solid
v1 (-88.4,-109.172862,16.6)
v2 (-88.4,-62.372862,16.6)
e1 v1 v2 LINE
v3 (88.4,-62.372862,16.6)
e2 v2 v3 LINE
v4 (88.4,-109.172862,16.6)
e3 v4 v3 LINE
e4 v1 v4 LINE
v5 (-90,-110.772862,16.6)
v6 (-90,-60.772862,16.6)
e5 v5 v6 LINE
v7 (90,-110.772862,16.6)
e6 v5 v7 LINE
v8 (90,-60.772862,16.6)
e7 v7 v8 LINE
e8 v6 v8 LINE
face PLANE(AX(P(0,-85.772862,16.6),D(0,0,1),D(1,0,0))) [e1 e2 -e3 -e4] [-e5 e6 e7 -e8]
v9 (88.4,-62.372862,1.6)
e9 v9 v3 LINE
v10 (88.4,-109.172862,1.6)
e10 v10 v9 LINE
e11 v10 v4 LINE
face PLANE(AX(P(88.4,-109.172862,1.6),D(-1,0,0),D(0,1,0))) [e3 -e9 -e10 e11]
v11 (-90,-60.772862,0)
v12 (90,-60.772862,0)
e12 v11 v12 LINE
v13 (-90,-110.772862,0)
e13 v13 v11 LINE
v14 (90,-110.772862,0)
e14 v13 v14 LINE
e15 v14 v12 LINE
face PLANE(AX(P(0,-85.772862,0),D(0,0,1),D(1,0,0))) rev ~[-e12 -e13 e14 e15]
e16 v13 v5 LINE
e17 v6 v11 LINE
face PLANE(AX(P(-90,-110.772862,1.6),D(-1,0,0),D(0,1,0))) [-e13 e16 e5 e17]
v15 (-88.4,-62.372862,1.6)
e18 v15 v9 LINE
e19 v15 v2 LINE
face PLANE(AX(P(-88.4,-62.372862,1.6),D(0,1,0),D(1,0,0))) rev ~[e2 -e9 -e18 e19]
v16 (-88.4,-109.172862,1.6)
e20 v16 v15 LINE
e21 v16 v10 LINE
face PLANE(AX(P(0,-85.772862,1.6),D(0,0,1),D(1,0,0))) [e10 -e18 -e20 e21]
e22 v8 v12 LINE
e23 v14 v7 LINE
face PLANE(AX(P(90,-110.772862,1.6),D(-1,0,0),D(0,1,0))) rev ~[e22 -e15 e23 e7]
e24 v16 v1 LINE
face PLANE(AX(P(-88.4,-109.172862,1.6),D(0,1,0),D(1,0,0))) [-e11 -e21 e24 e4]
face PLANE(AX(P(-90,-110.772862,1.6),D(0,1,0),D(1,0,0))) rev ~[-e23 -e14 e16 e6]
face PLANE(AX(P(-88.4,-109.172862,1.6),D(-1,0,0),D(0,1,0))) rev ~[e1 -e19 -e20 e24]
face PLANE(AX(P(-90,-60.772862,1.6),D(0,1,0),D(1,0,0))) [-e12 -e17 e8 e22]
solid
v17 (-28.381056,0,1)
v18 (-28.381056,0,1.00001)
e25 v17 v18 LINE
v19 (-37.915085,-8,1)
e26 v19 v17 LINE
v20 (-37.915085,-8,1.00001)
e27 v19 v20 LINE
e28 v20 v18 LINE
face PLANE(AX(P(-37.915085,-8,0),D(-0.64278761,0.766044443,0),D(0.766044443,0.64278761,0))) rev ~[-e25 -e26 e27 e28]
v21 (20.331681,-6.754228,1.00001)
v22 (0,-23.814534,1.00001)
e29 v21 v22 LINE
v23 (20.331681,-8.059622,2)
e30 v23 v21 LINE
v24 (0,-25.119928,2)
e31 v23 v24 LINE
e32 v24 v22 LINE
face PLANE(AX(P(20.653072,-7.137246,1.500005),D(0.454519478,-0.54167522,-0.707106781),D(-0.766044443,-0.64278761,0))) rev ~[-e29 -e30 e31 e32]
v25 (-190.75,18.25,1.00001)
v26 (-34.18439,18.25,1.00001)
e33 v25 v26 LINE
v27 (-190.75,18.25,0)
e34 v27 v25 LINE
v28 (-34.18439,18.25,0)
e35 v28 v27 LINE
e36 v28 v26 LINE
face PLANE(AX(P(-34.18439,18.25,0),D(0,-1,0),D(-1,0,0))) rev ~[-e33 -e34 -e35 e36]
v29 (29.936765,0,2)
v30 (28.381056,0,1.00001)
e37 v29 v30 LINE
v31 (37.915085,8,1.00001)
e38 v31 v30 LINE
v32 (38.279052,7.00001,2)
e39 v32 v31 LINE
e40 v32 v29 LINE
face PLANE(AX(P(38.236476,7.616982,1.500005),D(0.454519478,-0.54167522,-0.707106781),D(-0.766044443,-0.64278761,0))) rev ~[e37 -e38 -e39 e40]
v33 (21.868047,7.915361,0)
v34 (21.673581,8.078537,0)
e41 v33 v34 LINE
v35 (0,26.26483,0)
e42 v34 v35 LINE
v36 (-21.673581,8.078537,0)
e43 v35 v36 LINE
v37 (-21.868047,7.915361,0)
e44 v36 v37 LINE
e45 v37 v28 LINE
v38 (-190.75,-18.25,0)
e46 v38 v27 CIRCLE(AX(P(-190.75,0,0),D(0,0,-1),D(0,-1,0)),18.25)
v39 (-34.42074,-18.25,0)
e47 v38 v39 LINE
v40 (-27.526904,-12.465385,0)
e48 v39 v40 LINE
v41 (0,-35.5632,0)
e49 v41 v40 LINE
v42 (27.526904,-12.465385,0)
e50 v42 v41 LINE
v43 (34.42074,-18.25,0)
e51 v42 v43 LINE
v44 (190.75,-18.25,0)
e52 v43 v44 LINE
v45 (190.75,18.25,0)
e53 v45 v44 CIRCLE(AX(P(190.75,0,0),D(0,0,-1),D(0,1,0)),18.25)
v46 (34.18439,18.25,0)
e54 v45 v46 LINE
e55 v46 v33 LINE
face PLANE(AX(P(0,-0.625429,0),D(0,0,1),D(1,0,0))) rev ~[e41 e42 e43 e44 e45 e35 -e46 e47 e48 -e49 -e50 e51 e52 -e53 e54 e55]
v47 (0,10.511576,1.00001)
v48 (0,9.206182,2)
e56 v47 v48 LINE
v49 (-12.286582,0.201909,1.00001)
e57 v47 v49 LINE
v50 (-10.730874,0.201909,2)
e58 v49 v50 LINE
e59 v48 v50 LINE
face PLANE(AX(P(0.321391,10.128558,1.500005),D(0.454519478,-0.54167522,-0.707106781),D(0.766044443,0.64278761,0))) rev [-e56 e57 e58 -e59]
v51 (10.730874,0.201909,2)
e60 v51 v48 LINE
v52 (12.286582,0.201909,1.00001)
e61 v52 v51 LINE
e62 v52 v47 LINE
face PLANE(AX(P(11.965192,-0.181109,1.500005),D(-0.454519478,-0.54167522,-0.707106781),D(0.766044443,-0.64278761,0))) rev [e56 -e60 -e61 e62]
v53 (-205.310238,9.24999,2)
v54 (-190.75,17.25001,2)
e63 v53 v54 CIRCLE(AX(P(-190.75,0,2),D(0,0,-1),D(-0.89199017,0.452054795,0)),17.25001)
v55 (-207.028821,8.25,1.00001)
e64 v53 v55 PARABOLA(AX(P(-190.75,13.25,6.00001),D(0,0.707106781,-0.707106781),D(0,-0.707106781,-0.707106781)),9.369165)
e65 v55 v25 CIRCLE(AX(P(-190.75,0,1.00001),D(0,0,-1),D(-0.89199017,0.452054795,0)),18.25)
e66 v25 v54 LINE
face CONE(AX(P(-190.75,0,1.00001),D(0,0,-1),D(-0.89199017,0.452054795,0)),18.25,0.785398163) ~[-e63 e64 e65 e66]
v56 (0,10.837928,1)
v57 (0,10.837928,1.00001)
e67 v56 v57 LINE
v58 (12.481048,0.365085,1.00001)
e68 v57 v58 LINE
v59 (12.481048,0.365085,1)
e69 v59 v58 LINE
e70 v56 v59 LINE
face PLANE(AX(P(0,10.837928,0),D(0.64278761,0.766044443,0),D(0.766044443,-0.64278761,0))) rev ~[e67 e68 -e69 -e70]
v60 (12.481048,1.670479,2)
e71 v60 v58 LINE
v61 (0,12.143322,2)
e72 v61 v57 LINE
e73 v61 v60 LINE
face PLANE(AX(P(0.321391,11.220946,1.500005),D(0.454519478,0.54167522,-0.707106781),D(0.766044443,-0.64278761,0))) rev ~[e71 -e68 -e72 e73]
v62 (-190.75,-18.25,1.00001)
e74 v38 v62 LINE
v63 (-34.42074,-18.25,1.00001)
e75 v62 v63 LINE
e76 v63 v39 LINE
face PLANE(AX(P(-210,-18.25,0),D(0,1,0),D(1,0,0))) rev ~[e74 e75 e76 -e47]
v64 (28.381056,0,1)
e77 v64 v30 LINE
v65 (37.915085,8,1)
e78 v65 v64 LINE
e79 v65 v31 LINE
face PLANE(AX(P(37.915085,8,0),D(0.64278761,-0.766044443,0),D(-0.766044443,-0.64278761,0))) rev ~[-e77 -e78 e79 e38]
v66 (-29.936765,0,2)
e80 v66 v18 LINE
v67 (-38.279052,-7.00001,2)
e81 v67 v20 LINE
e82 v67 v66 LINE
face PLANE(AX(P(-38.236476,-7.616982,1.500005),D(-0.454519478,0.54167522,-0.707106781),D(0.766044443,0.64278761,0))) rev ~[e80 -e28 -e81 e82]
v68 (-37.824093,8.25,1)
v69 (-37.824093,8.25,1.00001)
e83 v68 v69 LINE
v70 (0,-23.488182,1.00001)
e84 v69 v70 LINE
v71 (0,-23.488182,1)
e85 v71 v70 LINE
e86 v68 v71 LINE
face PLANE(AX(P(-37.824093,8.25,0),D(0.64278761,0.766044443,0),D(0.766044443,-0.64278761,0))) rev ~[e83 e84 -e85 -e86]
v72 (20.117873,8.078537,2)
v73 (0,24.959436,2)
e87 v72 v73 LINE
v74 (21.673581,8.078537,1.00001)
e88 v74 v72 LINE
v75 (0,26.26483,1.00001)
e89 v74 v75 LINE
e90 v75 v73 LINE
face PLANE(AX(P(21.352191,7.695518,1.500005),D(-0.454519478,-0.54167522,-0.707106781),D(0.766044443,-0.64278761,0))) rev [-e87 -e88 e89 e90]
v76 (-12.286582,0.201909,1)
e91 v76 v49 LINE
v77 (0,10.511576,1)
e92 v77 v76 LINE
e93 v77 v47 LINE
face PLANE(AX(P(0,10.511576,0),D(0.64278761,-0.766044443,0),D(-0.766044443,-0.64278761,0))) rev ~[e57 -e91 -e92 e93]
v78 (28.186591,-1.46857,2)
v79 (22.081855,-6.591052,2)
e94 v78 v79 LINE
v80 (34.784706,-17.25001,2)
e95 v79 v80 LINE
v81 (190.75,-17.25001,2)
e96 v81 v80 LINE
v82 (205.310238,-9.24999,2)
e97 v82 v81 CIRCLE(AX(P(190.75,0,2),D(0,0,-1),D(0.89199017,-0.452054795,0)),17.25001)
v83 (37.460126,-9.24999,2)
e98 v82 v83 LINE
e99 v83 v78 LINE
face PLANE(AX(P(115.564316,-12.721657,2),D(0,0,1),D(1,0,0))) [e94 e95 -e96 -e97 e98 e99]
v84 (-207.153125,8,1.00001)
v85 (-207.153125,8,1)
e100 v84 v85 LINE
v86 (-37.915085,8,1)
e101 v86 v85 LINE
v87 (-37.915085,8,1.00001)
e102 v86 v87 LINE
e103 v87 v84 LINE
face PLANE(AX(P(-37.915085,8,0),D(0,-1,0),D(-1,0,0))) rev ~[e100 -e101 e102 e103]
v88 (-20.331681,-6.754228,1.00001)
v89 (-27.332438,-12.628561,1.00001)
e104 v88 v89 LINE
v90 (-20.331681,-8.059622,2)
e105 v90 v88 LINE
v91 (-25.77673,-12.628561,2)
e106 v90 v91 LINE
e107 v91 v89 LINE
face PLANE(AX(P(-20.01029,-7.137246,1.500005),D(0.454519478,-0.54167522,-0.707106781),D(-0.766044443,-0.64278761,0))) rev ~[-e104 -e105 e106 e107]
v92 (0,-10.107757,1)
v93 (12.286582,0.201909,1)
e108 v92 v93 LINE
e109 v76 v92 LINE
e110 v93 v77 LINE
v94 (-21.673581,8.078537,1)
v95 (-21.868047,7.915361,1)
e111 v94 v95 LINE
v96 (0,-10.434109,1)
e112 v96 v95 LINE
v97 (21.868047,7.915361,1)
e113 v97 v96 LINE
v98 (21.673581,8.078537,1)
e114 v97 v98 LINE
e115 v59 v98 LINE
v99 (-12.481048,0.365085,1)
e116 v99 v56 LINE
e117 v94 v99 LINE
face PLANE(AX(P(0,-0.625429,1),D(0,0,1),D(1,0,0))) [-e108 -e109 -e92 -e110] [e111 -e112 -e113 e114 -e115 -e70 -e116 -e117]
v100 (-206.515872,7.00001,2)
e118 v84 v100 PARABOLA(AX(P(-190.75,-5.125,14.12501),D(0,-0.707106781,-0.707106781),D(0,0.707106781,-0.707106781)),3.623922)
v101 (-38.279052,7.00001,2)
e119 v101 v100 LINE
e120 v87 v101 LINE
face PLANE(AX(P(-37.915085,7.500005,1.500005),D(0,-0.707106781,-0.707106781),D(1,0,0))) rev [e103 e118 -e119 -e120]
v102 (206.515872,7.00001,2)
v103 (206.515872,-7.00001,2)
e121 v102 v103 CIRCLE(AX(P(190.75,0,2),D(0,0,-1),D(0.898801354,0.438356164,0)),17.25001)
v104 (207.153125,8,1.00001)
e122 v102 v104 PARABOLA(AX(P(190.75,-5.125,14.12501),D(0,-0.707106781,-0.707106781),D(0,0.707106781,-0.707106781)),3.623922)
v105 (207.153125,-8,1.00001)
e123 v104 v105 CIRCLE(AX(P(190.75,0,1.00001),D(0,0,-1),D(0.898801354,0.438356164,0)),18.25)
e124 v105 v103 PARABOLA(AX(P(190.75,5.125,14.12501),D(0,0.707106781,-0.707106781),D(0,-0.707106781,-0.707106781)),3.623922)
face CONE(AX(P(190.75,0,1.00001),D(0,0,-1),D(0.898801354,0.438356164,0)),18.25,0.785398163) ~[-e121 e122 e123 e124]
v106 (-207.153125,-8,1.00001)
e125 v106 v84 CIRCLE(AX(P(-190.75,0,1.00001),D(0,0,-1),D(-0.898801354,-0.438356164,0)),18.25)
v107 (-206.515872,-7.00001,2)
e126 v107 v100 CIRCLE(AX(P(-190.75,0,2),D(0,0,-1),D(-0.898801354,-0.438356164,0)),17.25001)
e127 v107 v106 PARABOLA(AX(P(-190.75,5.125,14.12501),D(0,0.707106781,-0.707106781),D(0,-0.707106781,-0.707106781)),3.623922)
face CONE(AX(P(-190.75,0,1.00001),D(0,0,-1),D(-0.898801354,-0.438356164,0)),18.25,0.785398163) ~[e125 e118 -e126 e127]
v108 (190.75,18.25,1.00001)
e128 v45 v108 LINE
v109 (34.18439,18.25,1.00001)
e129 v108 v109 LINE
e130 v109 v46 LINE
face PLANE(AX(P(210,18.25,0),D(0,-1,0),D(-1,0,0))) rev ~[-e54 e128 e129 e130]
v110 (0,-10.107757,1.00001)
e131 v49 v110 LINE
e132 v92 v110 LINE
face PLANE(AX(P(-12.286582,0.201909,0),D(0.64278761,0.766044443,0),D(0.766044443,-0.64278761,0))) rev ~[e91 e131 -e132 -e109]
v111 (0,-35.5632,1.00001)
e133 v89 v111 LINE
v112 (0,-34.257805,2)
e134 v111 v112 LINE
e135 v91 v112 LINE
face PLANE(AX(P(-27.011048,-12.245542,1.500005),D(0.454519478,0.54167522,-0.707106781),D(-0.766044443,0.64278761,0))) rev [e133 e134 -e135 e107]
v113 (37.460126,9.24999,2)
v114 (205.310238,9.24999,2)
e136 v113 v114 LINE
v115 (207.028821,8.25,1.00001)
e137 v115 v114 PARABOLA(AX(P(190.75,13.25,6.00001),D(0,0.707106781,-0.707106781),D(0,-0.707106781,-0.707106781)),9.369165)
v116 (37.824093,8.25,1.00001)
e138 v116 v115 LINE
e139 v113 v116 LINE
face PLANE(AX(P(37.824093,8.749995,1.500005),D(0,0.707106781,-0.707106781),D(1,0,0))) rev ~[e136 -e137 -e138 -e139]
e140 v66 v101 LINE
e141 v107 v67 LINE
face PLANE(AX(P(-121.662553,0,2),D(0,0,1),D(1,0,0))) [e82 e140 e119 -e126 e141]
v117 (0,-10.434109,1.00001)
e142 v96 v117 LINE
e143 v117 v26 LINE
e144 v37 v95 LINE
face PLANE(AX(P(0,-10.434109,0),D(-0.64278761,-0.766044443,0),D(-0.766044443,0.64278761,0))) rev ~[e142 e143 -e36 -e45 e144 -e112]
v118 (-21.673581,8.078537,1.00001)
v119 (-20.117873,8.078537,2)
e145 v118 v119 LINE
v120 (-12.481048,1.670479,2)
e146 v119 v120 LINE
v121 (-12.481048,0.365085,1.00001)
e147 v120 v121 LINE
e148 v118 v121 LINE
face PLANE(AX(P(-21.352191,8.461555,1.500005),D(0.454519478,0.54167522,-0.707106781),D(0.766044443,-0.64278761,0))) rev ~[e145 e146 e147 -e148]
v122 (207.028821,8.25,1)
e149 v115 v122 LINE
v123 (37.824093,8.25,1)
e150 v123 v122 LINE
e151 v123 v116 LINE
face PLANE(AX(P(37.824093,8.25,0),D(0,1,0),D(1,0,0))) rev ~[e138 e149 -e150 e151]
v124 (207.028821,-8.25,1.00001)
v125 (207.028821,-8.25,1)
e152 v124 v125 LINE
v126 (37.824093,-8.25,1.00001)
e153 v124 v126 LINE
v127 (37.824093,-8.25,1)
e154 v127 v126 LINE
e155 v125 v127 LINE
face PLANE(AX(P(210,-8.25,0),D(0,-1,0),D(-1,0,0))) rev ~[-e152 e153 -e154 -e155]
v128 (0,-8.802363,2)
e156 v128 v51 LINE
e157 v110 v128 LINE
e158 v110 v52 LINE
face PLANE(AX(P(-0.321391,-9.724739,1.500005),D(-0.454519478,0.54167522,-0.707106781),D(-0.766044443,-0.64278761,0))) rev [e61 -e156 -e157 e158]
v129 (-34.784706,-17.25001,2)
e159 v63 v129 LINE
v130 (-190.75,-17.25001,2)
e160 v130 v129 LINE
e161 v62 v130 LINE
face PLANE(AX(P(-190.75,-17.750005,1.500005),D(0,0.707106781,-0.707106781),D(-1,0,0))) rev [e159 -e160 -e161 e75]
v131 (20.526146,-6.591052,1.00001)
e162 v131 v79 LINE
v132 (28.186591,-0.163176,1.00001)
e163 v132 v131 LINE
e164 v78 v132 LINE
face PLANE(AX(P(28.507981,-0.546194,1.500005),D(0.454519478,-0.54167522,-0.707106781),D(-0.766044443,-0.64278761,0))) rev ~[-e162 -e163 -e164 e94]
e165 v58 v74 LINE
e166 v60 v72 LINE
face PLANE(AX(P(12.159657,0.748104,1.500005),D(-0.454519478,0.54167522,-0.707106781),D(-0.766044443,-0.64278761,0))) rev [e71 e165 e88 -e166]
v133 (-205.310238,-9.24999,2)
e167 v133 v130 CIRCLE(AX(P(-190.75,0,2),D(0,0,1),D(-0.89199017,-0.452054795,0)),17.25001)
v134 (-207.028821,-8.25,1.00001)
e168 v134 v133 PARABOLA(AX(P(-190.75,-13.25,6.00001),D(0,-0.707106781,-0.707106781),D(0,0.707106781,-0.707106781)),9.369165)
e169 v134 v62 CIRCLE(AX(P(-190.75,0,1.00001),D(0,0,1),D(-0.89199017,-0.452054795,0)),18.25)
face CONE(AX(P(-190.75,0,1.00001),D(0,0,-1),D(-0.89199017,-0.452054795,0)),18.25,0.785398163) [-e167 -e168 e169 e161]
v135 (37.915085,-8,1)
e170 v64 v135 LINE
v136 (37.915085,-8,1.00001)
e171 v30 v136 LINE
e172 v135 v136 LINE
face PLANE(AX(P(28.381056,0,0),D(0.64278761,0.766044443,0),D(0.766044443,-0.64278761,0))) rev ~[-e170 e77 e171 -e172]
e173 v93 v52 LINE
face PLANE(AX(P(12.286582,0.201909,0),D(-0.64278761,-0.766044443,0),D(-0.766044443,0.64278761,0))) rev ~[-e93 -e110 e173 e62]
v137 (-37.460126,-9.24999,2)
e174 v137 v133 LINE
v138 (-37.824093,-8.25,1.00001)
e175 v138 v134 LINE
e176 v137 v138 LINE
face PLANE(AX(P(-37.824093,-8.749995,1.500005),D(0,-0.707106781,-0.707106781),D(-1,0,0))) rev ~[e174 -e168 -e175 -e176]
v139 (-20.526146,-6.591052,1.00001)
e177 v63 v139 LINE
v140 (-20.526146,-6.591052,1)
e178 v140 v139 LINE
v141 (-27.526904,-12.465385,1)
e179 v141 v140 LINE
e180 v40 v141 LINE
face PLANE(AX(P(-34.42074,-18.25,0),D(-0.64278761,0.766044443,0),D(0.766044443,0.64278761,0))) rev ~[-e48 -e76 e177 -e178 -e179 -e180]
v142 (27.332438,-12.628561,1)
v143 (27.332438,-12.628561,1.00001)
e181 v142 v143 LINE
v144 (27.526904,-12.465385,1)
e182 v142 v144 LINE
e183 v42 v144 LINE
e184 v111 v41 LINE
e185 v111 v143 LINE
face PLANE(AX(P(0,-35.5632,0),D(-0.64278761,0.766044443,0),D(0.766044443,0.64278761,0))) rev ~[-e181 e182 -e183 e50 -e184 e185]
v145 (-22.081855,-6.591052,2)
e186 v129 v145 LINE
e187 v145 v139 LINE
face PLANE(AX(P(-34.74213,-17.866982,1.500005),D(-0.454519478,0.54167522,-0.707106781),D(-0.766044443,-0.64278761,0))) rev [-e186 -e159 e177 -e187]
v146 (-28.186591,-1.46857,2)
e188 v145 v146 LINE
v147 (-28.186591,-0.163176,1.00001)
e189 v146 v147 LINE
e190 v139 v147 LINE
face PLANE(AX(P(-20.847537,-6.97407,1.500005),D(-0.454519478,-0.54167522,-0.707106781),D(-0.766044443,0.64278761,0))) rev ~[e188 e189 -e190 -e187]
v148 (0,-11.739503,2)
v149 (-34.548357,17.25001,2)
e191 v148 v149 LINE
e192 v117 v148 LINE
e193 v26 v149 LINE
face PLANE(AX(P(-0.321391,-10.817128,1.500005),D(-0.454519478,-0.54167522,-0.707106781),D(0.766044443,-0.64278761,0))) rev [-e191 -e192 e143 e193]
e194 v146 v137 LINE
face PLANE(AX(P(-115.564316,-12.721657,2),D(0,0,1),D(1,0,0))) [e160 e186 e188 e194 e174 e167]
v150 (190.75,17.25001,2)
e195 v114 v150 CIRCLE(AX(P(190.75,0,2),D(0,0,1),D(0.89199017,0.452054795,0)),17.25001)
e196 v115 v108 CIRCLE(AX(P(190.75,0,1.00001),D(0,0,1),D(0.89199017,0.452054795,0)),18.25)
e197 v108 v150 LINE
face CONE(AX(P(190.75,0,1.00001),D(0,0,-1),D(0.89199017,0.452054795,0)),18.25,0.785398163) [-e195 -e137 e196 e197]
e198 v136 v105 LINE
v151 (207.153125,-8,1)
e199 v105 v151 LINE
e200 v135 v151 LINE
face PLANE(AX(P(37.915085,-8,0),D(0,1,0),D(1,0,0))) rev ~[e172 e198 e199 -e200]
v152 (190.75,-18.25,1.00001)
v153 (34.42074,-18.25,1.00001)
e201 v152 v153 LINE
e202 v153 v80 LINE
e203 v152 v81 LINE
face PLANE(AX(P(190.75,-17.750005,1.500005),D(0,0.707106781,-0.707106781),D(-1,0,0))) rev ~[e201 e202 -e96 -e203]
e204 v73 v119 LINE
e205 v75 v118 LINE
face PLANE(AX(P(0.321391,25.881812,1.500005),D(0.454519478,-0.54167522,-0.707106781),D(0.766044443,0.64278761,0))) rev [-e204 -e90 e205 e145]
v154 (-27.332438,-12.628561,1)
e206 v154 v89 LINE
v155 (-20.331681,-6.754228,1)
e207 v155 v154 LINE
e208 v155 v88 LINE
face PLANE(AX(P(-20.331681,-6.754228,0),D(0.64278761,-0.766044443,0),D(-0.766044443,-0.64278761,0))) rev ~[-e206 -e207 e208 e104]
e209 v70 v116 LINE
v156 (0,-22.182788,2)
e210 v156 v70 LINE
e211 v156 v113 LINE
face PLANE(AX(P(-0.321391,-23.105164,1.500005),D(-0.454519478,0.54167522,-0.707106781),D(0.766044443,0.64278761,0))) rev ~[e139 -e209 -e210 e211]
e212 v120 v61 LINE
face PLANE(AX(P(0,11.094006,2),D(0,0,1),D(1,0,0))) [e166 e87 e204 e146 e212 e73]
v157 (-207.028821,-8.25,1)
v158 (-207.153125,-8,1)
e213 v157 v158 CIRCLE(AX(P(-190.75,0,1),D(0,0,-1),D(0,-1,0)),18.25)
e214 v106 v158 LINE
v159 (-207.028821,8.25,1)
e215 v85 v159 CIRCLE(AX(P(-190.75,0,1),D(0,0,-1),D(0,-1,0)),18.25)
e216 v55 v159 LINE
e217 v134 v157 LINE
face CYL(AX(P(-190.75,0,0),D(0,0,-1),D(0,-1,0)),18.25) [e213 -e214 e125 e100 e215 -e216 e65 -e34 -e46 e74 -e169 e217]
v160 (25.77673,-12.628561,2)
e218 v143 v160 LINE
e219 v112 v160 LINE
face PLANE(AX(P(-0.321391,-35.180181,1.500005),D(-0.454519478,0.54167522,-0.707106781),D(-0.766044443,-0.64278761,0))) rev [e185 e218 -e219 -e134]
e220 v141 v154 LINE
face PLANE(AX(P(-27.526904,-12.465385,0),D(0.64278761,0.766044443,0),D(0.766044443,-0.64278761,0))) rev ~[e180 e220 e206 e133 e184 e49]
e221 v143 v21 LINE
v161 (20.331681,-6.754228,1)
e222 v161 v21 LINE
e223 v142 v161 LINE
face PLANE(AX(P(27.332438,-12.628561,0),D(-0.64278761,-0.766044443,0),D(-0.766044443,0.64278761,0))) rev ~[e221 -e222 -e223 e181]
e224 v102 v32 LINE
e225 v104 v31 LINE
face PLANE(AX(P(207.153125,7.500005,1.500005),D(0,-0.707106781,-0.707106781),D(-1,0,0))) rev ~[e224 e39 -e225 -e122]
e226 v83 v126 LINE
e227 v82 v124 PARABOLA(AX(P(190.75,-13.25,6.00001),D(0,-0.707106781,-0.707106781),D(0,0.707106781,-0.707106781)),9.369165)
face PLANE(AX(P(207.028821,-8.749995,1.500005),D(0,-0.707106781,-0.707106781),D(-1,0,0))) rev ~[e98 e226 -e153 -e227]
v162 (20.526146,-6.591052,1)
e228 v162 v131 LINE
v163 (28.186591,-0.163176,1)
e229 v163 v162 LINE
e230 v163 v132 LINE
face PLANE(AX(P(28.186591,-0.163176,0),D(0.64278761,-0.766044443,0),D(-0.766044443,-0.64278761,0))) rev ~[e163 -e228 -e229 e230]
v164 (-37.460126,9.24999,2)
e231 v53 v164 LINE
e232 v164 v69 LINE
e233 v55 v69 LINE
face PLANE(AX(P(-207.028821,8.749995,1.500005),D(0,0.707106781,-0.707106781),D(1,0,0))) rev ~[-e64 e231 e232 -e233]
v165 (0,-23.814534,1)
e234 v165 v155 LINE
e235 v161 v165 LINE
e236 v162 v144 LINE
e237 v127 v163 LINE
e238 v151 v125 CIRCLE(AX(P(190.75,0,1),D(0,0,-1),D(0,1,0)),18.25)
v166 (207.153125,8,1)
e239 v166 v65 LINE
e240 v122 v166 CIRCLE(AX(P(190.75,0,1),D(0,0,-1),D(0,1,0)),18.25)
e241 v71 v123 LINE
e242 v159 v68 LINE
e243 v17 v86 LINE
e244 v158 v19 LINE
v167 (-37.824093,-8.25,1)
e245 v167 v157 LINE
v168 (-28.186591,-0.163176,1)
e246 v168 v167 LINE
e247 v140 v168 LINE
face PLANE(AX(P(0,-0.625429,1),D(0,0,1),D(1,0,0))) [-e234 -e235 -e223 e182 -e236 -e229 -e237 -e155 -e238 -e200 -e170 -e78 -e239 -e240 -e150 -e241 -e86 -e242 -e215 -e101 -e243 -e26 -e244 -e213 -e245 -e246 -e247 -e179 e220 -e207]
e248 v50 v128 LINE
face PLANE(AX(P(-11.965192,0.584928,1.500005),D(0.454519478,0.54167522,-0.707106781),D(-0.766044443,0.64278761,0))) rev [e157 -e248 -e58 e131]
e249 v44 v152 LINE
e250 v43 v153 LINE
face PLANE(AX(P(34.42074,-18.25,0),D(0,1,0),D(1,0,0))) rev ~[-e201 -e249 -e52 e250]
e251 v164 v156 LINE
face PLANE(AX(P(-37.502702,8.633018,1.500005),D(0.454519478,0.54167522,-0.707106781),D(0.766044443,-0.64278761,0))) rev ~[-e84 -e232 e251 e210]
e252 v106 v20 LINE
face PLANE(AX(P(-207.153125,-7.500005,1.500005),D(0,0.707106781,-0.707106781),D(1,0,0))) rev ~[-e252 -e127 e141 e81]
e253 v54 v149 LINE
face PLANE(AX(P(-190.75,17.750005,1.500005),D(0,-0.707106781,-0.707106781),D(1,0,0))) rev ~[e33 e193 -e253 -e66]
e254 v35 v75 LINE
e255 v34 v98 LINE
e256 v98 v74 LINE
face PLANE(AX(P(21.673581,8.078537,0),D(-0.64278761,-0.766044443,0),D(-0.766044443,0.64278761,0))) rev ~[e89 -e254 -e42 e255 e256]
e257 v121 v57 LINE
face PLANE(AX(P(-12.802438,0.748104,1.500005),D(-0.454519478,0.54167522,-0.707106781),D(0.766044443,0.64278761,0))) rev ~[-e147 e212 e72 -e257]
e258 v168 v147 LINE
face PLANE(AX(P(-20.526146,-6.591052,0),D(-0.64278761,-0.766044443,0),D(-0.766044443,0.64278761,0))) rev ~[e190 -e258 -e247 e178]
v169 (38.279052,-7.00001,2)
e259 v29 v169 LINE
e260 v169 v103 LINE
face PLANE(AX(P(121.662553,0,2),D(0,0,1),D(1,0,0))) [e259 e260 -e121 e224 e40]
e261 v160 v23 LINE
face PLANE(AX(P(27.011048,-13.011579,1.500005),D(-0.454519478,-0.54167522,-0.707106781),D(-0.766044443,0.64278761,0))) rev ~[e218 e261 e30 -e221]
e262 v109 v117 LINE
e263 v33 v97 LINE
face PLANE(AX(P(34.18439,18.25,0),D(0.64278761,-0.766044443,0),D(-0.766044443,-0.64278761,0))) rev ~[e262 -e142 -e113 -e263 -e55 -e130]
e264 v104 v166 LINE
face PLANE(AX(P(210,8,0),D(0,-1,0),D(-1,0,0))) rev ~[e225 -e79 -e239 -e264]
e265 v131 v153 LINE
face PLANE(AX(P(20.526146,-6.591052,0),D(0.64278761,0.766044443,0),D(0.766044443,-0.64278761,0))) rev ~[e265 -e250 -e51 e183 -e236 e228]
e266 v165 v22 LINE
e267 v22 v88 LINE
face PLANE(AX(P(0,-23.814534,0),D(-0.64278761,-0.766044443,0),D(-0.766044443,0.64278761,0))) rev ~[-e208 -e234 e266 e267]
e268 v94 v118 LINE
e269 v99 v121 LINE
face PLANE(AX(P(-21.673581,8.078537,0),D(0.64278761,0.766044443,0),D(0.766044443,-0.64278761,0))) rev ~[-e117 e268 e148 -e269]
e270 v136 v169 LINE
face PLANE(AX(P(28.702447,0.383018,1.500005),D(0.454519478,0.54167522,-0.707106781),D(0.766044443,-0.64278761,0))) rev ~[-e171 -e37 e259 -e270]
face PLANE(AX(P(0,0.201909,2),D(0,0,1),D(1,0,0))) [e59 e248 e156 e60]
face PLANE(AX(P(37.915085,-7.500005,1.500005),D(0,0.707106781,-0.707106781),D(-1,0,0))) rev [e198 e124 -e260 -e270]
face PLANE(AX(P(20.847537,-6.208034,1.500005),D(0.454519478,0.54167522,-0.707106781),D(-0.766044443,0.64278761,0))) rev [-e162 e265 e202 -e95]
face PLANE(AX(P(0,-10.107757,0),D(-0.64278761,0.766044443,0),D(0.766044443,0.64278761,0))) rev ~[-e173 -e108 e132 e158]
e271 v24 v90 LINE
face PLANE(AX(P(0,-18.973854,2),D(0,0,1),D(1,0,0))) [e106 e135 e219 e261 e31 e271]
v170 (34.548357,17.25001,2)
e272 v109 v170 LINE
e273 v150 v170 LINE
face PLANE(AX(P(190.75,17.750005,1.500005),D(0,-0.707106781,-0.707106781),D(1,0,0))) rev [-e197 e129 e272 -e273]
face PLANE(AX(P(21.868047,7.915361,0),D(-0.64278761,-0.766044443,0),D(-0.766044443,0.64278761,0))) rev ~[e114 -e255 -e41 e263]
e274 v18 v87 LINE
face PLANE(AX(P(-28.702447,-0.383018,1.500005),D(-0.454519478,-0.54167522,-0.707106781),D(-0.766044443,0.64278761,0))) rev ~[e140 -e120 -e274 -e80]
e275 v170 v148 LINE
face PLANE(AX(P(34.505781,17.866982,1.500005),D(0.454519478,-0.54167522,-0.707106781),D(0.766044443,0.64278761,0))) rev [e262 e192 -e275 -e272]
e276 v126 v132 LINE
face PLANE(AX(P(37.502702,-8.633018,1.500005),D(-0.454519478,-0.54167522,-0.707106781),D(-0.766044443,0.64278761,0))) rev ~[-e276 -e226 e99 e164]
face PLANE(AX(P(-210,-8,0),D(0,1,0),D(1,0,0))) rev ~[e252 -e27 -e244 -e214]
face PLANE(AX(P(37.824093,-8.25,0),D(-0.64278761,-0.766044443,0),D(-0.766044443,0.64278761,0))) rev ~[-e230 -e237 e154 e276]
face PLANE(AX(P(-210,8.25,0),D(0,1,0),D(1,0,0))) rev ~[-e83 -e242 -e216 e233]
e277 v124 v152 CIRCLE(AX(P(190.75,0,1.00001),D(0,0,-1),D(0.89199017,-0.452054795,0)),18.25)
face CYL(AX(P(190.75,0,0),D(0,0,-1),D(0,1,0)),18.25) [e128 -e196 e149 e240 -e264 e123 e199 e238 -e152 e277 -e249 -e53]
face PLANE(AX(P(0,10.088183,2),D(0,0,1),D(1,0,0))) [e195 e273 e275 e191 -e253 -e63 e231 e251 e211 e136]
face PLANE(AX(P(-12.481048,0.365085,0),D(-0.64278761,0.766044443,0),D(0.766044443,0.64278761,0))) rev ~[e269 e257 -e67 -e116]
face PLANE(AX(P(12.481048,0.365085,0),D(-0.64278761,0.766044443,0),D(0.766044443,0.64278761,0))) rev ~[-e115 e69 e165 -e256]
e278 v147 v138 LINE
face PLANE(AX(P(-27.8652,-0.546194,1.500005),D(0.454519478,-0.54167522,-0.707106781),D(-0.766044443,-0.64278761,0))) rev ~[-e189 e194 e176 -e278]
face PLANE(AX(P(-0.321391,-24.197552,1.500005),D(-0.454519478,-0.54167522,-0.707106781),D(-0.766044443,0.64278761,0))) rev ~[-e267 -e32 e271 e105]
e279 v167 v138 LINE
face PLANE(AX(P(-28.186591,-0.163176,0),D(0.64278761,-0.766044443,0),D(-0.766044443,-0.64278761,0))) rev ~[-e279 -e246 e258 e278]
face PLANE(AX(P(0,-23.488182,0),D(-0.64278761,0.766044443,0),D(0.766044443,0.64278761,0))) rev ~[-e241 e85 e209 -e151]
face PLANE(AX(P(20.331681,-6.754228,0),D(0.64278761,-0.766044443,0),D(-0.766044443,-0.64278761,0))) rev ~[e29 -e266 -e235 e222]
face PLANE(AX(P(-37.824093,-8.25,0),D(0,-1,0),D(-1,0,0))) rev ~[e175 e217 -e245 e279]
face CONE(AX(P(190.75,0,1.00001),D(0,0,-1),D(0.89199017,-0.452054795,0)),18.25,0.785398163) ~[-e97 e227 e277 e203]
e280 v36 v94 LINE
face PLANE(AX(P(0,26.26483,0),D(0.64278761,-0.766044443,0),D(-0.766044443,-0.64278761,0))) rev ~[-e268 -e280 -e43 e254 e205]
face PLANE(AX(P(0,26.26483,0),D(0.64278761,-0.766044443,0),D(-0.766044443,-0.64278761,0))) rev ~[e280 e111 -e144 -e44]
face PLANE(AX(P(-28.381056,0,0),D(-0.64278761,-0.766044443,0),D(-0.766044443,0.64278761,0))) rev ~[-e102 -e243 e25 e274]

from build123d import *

# Parameters (mm, degrees)
F1_DEPTH  = 2
F3_DEPTH  = 2
F5_DEPTH  = 2
F7_DEPTH  = 2
F9_DEPTH  = 1
F12_DEPTH = 2
F13_SIZE  = 0.99999
F14_W     = 180
F14_H     = 50
F15_DEPTH = 1.6
F16_W     = 180
F16_H     = 50
F16_W_2   = 176.8
F16_H_2   = 46.8
F17_DEPTH = 15


# Not quite as in the source:
# - a fillet or chamfer is up to 0.001 mm smaller than in the source, because OpenCascade refuses the exact size


with BuildPart() as f1:
    # F0 (on Top) → F1 (new body)
    with BuildSketch(Plane.XY):
        Polygon((37.9150851114, 8), (28.3810563706, 0), (37.9150851114, -8), (210, -8), (210, 0), (210, 8), align=None)
    extrude(amount=F1_DEPTH)


with BuildPart() as f1b:
    # F0 (on Top) → F1, piece 2 (new body)
    with BuildSketch(Plane.XY):
        Polygon((-37.9150851114, -8), (-28.3810563706, 0), (-37.9150851114, 8), (-210, 8), (-210, 0), (-210, -8), align=None)
    extrude(amount=F1_DEPTH)


with BuildPart() as f3:
    # F2 (on Top) → F3 (new body)
    with BuildSketch(Plane.XY):
        Polygon((-37.8240925528, 8.25), (0, -23.4881821107), (37.8240925528, 8.25), (210, 8.25), (210, 18.25), (34.1843902102, 18.25), (0, -10.4341092174), (-34.1843902102, 18.25), (-210, 18.25), (-210, 8.25), align=None)
    extrude(amount=F3_DEPTH)


with BuildPart() as f5:
    # F4 (on Top) → F5 (new body)
    with BuildSketch(Plane.XY):
        Polygon((12.4810478052, 0.365085215), (21.6735811226, 8.0785365312), (0, 26.2648304575), (-21.6735811226, 8.0785365312), (-12.4810478052, 0.365085215), (0, 10.8379278251), align=None)
    extrude(amount=F5_DEPTH)


with BuildPart() as f5b:
    # F4 (on Top) → F5, piece 2 (new body)
    with BuildSketch(Plane.XY):
        Polygon((37.8240925528, -8.25), (28.1865908923, -0.1631759112), (20.5261464611, -6.591052008), (34.4207396164, -18.25), (210, -18.25), (210, -8.25), align=None)
    extrude(amount=F5_DEPTH)


with BuildPart() as f5c:
    # F4 (on Top) → F5, piece 3 (new body)
    with BuildSketch(Plane.XY):
        Polygon((-210, -18.25), (-34.4207396164, -18.25), (-20.5261464611, -6.591052008), (-28.1865908923, -0.1631759112), (-37.8240925528, -8.25), (-210, -8.25), align=None)
    extrude(amount=F5_DEPTH)


with BuildPart() as f7:
    # F6 (on Top) → F7 (new body)
    with BuildSketch(Plane.XY):
        Polygon((-27.3324382036, -12.6285607212), (0, -35.563199537), (27.3324382036, -12.6285607212), (20.3316809827, -6.7542279192), (0, -23.814533933), (-20.3316809827, -6.7542279192), align=None)
    extrude(amount=F7_DEPTH)


with BuildPart() as f7b:
    # F6 (on Top) → F7, piece 2 (new body)
    with BuildSketch(Plane.XY):
        Polygon((-12.2865823268, 0.2019093038), (0, -10.107757395), (12.2865823268, 0.2019093038), (0, 10.5115760027), align=None)
    extrude(amount=F7_DEPTH)


with BuildPart() as f9:
    # F8 (on Top) → F9 (new body)
    with BuildSketch(Plane.XY):
        Polygon((21.868046601, 7.9153606201), (0, 26.2648304575), (-21.868046601, 7.9153606201), (-34.1843902102, 18.25), (-210, 18.25), (-210, -18.25), (-34.4207396164, -18.25), (-27.526903682, -12.46538481), (0, -35.563199537), (27.526903682, -12.46538481), (34.4207396164, -18.25), (210, -18.25), (210, 18.25), (34.1843902102, 18.25), align=None)
    extrude(amount=F9_DEPTH)


with BuildPart() as f1_1:
    add(f1.part)

    # F10: union F1b, F3, F5, F5b, F5c, F7, F7b, F9
    add(f1b.part)
    add(f3.part)
    add(f5.part)
    add(f5b.part)
    add(f5c.part)
    add(f7.part)
    add(f7b.part)
    add(f9.part)

    # F11 (on Top) → F12 (cut, through all)
    with BuildSketch(Plane.XY):
        with BuildLine():
            ThreePointArc((190.75, 18.25), (209, 0), (190.75, -18.25))
            Line((190.75, -18.25), (224.6172776222, -18.25))
            Line((224.6172776222, -18.25), (224.6172776222, 18.25))
            Line((224.6172776222, 18.25), (190.75, 18.25))
        make_face()
        with BuildLine():
            Line((-224.6172776222, -18.25), (-190.75, -18.25))
            ThreePointArc((-190.75, -18.25), (-209, 0), (-190.75, 18.25))
            Line((-190.75, 18.25), (-224.6172776222, 18.25))
            Line((-224.6172776222, 18.25), (-224.6172776222, -18.25))
        make_face()
    extrude(amount=F12_DEPTH, mode=Mode.SUBTRACT)

    # F13 (size 1 in the source; OpenCascade refuses exactly that, so slightly less here)
    f13_edges = [f1_1.edges().sort_by_distance(p)[0] for p in [
        (-122.426457, 8.25, 2),
        (-200.302487, 15.550322, 2),
        (-112.467195, 18.25, 2),
        (-17.092195, 3.907945, 2),
        (17.092195, 3.907945, 2),
        (112.467195, 18.25, 2),
        (200.302487, 15.550322, 2),
        (122.426457, 8.25, 2),
        (18.912046, -7.619091, 2),
        (-18.912046, -7.619091, 2),
        (-122.534105, -8, 2),
        (-209, 0, 2),
        (-122.534105, 8, 2),
        (-33.148071, 4, 2),
        (-33.148071, -4, 2),
        (-33.005342, -4.206588, 2),
        (-24.356369, -3.377114, 2),
        (-27.473443, -12.420526, 2),
        (-112.58537, -18.25, 2),
        (-200.302487, -15.550322, 2),
        (-122.426457, -8.25, 2),
        (6.240524, 5.601507, 2),
        (17.077314, 4.221811, 2),
        (10.836791, 17.171683, 2),
        (-10.836791, 17.171683, 2),
        (-17.077314, 4.221811, 2),
        (-6.240524, 5.601507, 2),
        (-6.143291, -4.952924, 2),
        (6.143291, -4.952924, 2),
        (6.143291, 5.356743, 2),
        (-6.143291, 5.356743, 2),
        (-23.83206, -9.691394, 2),
        (-13.666219, -24.09588, 2),
        (13.666219, -24.09588, 2),
        (23.83206, -9.691394, 2),
        (10.16584, -15.284381, 2),
        (-10.16584, -15.284381, 2),
        (122.426457, -8.25, 2),
        (200.302487, -15.550322, 2),
        (112.58537, -18.25, 2),
        (27.473443, -12.420526, 2),
        (24.356369, -3.377114, 2),
        (33.005342, -4.206588, 2),
        (122.534105, 8, 2),
        (209, 0, 2),
        (122.534105, -8, 2),
        (33.148071, -4, 2),
        (33.148071, 4, 2),
    ]]
    chamfer(f13_edges, length=F13_SIZE)


with BuildPart() as f15:
    # F14 (on Top) → F15 (new body)
    with BuildSketch(Plane.XY):
        with Locations((0, -85.7728616616)):
            Rectangle(F14_W, F14_H)
    extrude(amount=F15_DEPTH)

    # F16 (on face) → F17 (join)
    with BuildSketch(Plane.XY.offset(1.6)):
        with Locations((0, -85.7728616616)):
            Rectangle(F16_W, F16_H)
        with Locations((0, -85.7728616616)):
            Rectangle(F16_W_2, F16_H_2, mode=Mode.SUBTRACT)
    extrude(amount=F17_DEPTH)


solid = Compound([f1_1.part, f15.part])
